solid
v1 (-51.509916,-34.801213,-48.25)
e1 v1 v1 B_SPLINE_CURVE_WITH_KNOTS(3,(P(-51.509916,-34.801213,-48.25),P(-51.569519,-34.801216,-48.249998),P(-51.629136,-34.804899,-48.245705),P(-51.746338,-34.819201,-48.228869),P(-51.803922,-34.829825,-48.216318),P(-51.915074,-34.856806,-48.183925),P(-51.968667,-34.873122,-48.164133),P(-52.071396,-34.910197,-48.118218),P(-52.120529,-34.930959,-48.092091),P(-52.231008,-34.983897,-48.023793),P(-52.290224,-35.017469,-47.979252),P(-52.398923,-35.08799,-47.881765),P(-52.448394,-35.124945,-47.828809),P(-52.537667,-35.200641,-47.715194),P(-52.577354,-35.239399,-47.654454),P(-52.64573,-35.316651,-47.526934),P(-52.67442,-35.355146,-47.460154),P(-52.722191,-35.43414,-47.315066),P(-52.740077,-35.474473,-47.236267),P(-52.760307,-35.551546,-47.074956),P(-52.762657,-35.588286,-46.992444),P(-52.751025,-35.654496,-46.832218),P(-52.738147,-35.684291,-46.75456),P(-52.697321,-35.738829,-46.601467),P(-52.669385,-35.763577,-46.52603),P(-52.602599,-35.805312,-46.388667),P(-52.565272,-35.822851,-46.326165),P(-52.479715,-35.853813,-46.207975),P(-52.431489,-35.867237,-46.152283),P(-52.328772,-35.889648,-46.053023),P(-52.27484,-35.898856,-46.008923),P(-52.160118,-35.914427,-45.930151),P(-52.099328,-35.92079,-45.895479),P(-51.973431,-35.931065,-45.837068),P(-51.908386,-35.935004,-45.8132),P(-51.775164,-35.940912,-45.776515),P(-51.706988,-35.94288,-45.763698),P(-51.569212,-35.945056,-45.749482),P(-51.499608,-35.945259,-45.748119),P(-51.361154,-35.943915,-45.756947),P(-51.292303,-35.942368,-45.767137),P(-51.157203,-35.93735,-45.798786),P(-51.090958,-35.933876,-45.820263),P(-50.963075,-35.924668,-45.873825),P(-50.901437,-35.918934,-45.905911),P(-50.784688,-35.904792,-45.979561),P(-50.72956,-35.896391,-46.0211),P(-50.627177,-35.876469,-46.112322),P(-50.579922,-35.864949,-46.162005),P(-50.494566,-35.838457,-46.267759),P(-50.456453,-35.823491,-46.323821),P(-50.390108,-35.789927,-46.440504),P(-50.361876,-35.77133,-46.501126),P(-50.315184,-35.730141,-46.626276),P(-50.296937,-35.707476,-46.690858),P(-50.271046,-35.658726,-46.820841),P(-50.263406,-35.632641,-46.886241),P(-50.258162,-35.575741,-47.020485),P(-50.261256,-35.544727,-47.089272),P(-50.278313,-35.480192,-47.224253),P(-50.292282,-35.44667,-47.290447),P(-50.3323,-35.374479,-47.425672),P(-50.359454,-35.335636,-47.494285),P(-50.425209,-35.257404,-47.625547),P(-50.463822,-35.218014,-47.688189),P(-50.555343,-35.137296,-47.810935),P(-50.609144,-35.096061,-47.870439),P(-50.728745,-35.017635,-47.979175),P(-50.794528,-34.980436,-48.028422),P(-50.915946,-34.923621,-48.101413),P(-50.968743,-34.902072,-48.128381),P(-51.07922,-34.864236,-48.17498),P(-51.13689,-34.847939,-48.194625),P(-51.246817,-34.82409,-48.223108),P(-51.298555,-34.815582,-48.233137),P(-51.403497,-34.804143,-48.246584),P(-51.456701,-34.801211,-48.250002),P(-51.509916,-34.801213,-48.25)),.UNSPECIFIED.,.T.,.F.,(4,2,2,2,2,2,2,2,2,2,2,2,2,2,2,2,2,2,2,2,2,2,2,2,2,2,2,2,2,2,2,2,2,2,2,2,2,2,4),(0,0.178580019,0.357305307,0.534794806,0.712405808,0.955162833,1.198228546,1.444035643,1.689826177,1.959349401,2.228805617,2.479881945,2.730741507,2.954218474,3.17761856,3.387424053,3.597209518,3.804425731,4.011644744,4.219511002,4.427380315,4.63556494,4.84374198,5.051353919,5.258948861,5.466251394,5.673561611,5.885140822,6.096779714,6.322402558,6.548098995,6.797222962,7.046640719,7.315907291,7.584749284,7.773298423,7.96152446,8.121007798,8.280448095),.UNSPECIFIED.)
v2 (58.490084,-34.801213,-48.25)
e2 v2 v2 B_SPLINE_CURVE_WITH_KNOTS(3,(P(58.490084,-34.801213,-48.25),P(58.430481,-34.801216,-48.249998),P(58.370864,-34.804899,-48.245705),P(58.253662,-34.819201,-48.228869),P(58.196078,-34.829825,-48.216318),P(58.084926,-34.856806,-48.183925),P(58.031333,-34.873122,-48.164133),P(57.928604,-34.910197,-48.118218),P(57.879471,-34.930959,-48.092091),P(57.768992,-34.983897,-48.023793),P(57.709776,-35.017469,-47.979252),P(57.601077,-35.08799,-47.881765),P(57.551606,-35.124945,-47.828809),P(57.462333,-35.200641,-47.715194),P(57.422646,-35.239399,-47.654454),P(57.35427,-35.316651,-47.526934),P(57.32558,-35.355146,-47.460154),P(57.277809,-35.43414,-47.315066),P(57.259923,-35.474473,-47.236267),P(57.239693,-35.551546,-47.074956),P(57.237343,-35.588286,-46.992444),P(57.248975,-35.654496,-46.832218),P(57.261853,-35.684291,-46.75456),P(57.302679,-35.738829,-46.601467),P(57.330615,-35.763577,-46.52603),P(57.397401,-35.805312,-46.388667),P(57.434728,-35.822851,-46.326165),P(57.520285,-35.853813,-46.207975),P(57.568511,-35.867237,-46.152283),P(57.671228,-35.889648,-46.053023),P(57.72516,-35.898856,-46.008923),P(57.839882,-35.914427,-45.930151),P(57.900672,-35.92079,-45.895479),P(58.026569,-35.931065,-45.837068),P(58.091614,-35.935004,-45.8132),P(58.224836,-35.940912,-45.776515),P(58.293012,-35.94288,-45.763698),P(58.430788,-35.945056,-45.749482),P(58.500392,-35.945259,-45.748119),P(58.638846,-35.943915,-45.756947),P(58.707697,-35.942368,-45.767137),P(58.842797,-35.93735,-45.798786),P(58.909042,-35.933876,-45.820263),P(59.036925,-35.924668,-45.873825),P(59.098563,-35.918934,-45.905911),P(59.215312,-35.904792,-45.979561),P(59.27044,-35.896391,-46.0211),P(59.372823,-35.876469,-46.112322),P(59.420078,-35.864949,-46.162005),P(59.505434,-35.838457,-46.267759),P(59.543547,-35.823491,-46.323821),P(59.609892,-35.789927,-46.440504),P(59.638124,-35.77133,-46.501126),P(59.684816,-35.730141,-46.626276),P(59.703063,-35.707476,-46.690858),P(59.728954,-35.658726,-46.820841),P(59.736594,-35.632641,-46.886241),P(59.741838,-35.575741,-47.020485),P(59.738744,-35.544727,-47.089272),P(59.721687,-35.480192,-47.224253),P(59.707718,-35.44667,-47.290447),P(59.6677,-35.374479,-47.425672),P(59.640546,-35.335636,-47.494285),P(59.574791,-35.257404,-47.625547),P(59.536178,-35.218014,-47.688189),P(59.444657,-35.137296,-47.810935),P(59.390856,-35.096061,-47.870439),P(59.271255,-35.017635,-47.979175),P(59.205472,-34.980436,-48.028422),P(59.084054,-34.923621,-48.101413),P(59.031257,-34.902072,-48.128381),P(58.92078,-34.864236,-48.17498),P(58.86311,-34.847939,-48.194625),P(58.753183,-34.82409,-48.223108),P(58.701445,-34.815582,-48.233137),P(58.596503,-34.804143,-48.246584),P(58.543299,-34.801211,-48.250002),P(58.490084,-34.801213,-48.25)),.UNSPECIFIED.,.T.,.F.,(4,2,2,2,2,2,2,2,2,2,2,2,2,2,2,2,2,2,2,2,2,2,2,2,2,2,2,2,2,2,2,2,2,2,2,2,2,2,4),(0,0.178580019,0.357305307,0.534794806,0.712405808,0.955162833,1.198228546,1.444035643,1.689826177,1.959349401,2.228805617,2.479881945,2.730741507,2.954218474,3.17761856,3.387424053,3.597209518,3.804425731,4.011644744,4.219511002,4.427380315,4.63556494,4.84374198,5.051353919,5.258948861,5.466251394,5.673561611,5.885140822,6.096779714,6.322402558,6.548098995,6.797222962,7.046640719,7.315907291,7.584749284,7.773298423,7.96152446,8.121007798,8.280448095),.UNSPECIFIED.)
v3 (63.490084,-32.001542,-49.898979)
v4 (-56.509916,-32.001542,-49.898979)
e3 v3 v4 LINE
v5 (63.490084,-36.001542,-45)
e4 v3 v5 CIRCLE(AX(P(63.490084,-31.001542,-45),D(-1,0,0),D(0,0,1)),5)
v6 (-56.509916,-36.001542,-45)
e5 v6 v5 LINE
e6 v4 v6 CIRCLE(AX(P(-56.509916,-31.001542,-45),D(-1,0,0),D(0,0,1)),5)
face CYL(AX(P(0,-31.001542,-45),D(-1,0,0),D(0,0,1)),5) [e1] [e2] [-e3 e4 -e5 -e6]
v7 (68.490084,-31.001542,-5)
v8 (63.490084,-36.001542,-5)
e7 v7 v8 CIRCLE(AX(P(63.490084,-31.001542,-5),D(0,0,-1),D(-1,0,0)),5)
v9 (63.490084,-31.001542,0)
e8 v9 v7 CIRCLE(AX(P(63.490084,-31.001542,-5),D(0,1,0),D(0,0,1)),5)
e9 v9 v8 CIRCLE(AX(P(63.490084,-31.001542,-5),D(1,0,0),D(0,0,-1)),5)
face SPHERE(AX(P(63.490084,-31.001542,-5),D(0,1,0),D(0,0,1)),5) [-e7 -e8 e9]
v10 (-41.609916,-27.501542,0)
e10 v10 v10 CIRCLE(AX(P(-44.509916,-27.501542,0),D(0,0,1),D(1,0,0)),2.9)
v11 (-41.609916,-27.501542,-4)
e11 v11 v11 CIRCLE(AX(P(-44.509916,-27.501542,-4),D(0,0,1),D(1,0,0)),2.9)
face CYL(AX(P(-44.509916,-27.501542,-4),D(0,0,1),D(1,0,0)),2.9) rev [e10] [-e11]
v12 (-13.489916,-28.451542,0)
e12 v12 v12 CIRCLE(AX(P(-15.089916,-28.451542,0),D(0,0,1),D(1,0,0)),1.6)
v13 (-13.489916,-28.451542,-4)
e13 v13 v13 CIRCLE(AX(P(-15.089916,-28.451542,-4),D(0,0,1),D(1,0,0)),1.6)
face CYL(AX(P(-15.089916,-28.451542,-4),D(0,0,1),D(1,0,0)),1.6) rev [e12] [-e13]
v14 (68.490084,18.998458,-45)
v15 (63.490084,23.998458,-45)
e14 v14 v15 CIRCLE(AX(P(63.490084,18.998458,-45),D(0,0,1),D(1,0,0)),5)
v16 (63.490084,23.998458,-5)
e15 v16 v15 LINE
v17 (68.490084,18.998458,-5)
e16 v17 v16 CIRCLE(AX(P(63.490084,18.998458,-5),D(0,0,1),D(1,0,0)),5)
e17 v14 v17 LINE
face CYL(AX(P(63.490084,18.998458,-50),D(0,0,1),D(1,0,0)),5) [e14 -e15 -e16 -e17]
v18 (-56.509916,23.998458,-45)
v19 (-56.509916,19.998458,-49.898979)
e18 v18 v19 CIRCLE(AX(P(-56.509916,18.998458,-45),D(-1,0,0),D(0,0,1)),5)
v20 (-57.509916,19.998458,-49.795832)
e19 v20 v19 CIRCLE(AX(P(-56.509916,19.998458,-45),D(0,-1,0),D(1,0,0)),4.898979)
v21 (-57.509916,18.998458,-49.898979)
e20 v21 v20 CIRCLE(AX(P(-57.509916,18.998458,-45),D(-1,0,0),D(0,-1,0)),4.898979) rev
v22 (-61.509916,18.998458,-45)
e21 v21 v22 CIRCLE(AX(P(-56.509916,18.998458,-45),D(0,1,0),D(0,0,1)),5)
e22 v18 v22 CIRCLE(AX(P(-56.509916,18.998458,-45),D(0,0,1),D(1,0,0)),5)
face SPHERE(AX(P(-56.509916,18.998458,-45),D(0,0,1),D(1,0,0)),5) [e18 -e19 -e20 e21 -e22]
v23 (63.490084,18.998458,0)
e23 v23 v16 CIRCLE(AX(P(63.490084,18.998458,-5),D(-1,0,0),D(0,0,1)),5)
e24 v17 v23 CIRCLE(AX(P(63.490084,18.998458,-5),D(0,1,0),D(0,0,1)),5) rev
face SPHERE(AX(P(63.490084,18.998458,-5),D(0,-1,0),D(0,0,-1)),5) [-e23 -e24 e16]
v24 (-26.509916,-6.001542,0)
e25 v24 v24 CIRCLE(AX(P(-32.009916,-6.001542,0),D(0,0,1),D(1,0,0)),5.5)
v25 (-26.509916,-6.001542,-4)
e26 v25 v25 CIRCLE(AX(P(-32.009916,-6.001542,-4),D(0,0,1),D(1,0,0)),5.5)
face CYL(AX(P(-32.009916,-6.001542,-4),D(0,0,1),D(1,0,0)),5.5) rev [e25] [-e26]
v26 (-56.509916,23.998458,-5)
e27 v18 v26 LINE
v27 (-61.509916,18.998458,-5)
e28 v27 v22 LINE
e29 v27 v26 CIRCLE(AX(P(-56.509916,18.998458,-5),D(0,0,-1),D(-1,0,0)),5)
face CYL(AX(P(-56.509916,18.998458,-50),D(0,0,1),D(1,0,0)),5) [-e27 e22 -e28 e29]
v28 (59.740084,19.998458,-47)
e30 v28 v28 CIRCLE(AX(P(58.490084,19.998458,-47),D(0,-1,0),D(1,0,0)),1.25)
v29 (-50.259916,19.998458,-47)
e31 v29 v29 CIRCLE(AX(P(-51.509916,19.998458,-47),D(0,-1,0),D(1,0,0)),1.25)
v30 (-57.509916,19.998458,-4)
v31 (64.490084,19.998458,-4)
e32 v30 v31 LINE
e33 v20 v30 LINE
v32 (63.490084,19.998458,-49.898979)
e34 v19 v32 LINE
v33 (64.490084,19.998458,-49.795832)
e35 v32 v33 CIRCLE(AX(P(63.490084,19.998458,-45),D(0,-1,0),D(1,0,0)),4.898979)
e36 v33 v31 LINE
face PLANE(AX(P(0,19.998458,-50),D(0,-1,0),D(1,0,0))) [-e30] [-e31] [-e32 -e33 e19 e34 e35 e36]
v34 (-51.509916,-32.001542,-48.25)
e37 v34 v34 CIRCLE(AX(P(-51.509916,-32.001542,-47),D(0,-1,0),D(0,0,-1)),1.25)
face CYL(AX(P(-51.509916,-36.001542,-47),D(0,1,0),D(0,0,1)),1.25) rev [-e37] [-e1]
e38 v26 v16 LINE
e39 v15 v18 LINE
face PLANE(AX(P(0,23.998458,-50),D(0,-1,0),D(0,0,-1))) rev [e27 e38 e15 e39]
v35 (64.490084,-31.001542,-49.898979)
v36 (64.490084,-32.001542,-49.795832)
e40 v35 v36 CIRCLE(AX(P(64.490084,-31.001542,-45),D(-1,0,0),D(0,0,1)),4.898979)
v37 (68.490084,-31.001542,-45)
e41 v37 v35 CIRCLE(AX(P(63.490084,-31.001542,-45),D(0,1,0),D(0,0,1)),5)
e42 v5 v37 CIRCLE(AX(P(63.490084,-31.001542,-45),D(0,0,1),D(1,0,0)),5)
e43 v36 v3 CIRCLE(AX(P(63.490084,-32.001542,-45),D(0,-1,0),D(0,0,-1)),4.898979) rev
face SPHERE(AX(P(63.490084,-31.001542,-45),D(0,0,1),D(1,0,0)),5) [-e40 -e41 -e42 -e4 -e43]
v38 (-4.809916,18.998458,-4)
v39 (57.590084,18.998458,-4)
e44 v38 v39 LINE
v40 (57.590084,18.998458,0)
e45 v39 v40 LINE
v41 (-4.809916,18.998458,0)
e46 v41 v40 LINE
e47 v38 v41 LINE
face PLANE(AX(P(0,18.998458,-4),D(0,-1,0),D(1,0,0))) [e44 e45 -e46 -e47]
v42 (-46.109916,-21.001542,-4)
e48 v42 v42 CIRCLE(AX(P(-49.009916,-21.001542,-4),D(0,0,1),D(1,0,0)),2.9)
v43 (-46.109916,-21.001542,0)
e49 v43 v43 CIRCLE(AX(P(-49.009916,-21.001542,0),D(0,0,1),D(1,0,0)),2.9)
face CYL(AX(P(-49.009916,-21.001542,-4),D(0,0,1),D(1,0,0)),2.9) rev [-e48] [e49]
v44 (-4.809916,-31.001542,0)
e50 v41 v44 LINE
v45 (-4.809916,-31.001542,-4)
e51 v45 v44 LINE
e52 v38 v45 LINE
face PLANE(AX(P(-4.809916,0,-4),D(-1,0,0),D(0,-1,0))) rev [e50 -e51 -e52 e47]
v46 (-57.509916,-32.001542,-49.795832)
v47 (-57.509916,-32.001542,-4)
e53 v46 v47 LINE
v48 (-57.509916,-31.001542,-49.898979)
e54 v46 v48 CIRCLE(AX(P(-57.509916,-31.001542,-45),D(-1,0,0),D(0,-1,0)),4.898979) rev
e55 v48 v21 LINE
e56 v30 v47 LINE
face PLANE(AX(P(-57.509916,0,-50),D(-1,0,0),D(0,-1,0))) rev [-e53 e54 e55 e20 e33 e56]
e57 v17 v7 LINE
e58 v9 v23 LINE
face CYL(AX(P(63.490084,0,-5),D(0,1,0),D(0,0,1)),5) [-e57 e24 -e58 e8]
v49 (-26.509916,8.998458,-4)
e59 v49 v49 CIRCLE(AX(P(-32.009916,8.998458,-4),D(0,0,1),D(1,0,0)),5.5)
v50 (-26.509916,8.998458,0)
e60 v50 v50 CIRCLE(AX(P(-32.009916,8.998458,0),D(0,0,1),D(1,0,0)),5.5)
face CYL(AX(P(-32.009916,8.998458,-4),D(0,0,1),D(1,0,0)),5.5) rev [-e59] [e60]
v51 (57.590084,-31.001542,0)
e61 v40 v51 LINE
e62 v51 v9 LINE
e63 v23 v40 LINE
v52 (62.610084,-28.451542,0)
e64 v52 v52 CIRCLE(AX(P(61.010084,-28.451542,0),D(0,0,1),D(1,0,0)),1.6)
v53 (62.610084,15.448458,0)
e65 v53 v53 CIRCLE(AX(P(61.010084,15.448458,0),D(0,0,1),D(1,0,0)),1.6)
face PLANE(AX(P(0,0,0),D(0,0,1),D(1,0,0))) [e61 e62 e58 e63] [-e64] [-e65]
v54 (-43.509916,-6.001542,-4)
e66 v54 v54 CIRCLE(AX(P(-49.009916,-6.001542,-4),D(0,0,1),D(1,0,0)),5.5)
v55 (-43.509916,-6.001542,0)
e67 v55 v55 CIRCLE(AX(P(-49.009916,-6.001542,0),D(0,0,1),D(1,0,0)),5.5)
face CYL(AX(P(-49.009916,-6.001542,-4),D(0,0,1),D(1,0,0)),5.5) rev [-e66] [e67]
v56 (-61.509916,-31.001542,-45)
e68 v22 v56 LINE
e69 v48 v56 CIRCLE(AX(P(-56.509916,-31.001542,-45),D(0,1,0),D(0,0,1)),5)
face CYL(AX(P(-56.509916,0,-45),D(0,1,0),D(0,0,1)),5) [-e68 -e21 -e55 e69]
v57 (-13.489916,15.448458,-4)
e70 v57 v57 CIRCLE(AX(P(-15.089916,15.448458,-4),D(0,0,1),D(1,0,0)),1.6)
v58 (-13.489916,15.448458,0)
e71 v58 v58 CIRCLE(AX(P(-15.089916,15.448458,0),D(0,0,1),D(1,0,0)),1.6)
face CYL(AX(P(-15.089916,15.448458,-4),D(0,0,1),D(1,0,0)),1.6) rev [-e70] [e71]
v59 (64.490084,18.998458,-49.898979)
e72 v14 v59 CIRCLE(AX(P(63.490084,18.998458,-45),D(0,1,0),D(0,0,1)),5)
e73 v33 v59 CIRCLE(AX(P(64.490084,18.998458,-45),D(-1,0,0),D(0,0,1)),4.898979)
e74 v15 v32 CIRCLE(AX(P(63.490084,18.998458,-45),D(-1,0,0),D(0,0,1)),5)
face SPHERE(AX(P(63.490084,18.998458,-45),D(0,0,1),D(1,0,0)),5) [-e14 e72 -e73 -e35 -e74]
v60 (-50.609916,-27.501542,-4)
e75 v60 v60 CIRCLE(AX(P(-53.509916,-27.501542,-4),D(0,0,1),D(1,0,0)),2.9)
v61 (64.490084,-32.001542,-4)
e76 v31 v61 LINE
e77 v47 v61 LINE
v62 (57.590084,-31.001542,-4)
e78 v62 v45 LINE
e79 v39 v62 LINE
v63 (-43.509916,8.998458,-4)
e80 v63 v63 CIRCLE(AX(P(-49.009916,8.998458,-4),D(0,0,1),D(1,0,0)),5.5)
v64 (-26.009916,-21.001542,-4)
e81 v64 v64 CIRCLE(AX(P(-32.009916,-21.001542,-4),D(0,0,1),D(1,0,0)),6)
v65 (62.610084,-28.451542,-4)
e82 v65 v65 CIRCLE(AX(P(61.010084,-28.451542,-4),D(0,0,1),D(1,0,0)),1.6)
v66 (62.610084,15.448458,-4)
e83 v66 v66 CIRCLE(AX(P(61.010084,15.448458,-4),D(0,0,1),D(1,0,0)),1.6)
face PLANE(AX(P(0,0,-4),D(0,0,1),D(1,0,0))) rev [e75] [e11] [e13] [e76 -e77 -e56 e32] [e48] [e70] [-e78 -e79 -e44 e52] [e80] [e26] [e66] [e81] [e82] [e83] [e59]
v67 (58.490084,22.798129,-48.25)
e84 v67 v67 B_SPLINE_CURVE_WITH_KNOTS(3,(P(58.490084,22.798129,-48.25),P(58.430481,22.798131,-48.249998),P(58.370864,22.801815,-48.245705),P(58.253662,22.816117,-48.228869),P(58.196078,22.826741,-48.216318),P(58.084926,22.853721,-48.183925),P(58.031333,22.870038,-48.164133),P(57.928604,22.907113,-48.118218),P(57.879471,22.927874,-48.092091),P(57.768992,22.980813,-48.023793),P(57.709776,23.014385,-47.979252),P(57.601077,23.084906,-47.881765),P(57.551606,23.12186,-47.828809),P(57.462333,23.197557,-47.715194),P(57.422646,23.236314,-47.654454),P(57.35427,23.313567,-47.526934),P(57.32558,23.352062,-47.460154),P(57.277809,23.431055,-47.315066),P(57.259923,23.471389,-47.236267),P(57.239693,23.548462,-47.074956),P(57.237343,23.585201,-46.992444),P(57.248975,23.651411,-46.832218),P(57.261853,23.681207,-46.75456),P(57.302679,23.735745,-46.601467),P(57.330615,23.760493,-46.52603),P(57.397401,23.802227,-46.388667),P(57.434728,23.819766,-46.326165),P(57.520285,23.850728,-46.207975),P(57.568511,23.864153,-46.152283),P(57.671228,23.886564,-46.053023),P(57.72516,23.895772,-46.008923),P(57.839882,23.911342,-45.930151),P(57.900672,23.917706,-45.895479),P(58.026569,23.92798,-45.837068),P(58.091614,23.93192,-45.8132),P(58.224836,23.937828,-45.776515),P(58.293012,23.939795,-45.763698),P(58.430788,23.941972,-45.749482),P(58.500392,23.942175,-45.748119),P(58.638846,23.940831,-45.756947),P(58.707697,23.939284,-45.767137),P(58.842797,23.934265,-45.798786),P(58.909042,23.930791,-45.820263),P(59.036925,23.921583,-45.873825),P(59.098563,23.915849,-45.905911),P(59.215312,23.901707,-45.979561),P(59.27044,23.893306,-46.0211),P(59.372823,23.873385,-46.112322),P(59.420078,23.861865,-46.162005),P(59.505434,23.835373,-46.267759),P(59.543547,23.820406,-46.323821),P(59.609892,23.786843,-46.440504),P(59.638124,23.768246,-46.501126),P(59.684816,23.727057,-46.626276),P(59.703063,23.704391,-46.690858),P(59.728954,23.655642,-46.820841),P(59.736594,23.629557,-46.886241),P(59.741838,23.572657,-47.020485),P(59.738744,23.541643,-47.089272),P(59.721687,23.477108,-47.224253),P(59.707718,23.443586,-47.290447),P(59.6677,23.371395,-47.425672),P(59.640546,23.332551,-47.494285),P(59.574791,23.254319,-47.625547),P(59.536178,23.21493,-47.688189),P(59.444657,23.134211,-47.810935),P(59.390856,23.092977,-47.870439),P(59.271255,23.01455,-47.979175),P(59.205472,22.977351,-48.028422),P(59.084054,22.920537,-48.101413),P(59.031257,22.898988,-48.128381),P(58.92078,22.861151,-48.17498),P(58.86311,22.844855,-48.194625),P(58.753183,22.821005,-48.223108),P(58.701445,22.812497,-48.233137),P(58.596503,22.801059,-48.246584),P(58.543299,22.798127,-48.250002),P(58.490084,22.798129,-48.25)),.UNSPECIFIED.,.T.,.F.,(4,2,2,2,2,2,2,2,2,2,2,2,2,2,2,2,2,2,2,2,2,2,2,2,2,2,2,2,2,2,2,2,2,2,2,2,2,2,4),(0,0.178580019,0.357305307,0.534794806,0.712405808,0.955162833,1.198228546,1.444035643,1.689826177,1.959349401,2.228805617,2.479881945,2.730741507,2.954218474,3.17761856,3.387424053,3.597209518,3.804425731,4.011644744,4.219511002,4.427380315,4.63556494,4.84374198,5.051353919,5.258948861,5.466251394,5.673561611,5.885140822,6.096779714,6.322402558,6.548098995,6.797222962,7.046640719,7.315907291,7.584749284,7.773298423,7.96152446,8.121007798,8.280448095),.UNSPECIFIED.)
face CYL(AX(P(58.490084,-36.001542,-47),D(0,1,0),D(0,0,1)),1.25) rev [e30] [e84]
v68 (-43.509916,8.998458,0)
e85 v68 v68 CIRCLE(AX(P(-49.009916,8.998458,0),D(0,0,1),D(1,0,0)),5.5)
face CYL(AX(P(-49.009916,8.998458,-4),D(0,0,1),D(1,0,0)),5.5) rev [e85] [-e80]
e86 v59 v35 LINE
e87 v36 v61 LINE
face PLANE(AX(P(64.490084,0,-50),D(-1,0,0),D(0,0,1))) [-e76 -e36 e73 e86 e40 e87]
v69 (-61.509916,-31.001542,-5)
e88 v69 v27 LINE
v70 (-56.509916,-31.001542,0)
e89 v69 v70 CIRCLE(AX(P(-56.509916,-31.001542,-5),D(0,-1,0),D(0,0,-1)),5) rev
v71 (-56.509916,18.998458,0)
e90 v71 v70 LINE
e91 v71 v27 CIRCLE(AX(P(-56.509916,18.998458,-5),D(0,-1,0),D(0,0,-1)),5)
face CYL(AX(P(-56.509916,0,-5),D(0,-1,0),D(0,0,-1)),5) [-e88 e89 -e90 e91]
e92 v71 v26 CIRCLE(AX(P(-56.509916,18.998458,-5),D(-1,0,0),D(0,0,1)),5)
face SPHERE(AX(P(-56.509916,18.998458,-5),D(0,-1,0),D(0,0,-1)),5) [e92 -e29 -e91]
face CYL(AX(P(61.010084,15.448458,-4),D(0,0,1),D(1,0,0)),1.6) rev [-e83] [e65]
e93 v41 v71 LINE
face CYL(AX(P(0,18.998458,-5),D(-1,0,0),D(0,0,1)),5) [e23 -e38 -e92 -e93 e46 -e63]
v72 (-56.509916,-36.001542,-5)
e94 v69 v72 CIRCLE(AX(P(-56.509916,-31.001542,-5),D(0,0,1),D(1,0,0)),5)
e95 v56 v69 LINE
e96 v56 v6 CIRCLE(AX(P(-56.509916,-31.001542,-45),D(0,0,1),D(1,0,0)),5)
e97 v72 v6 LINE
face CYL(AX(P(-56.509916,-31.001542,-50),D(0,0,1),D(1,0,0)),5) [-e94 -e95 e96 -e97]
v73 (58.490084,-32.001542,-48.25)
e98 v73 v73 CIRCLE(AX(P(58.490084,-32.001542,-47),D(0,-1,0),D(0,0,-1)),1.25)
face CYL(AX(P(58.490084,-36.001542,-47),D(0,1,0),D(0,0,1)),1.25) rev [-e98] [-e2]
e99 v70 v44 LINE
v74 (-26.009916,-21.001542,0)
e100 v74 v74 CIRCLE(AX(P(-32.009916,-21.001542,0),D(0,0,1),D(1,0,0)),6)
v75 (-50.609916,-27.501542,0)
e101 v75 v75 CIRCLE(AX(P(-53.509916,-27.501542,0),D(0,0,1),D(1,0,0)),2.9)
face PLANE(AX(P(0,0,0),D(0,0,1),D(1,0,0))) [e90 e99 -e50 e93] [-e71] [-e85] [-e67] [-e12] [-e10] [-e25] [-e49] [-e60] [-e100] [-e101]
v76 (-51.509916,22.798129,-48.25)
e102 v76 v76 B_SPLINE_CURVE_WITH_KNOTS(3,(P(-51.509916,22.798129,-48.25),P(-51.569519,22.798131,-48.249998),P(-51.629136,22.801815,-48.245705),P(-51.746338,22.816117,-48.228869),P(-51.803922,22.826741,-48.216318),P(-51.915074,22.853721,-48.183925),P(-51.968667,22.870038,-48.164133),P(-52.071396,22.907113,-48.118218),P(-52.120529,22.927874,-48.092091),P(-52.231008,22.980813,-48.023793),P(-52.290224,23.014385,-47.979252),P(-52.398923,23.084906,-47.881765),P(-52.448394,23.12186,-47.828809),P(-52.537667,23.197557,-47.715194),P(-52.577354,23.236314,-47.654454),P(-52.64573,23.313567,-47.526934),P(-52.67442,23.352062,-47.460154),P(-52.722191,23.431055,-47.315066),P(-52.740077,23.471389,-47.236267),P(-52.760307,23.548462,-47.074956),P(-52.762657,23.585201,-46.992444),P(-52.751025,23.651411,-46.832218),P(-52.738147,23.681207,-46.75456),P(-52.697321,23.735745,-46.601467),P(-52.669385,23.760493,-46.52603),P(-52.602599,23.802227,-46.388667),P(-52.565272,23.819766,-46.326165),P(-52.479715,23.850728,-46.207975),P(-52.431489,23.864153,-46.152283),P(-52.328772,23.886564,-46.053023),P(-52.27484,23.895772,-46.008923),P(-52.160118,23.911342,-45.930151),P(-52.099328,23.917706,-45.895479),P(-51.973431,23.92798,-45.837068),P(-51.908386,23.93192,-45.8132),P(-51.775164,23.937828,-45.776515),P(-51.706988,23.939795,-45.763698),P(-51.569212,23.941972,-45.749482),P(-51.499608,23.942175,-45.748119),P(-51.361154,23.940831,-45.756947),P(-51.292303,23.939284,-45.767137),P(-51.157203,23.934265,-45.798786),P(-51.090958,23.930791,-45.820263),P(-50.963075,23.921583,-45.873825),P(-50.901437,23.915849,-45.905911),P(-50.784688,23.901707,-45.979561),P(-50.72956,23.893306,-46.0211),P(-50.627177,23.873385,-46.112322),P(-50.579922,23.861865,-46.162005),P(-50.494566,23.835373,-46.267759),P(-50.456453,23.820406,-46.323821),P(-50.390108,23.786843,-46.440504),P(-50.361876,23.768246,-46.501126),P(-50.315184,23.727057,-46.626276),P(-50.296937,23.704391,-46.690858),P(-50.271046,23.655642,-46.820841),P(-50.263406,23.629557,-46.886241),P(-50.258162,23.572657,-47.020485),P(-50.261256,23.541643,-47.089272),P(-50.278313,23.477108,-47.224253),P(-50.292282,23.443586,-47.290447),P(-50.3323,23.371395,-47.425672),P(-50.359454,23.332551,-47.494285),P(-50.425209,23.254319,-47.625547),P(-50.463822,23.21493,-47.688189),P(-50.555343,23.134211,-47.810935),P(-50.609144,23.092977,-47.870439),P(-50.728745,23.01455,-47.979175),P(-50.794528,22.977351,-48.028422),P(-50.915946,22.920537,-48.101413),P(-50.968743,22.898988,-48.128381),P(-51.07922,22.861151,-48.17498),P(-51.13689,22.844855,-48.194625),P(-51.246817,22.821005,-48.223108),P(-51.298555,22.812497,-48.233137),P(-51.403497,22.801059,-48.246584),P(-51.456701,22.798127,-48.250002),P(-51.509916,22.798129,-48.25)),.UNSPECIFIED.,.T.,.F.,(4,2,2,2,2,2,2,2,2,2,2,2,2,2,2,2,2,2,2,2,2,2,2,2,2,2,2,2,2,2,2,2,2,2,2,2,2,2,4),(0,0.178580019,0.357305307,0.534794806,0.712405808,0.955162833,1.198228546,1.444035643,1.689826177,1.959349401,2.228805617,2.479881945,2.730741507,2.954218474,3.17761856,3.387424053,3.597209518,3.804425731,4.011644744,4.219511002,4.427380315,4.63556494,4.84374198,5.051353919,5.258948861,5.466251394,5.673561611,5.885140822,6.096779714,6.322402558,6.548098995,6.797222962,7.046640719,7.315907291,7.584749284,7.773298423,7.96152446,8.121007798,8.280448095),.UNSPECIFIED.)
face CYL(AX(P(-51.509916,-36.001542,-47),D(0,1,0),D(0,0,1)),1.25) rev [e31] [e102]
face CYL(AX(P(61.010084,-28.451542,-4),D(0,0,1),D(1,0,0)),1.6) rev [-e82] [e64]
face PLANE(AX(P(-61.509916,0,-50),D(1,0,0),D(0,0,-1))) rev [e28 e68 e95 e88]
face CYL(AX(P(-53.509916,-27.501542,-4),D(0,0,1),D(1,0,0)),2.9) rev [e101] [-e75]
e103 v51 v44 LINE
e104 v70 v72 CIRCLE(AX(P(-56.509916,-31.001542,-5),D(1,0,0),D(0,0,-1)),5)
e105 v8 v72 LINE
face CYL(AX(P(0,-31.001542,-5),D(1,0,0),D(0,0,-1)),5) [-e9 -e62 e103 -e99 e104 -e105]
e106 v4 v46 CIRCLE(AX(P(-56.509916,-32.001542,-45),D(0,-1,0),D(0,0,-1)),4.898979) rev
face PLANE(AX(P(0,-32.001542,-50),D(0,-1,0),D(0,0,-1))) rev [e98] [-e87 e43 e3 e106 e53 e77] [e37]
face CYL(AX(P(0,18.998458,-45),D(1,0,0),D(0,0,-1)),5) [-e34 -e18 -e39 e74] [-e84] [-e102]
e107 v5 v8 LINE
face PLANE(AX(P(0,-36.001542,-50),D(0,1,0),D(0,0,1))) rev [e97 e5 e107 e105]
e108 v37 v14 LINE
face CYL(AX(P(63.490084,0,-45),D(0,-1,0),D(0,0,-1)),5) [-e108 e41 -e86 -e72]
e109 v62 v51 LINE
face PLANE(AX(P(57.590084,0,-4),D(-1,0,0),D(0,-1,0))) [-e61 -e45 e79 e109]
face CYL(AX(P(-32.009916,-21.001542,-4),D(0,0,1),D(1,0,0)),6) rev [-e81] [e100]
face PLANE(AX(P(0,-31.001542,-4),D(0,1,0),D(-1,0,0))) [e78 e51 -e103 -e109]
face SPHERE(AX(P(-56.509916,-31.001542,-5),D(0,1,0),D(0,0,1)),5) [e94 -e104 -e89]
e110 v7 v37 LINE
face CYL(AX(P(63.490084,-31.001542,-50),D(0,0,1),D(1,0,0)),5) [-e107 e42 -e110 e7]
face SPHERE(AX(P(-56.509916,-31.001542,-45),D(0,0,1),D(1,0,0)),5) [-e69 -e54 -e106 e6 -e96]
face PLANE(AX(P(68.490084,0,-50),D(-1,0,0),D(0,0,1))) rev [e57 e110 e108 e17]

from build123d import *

# Parameters (mm, degrees)
SKETCH1_W           = 122
SKETCH1_H           = 52
SKETCH1_R           = 2.9
SKETCH1_R_2         = 6
SKETCH1_R_3         = 5.5
SKETCH1_W_2         = 62.4
SKETCH1_H_2         = 50
SKETCH1_R_4         = 1.6
BOSS_EXTRUDE1_DEPTH = 4
SKETCH1_3_W         = 4
SKETCH1_3_H         = 52
BOSS_EXTRUDE2_DEPTH = 50
SKETCH3_R           = 1.25
CUT_EXTRUDE1_DEPTH  = 104.879216611
FILLET2_R           = 5
FILLET3_R           = 5
FILLET4_R           = 5
FILLET5_R           = 5
FILLET6_R           = 5


# Some blends are built 0.0001 mm under size
with BuildPart() as part:
    # Sketch1 → Boss-Extrude1 (new body)
    with BuildSketch(Plane.XY):
        with Locations((3.490084273, -6.001542194)):
            Rectangle(SKETCH1_W, SKETCH1_H)
        with Locations((-53.509915727, -27.501542194)):
            Circle(SKETCH1_R, mode=Mode.SUBTRACT)
        with Locations((-44.509915727, -27.501542194)):
            Circle(SKETCH1_R, mode=Mode.SUBTRACT)
        with Locations((-49.009915727, -21.001542194)):
            Circle(SKETCH1_R, mode=Mode.SUBTRACT)
        with Locations((-32.009915727, -21.001542194)):
            Circle(SKETCH1_R_2, mode=Mode.SUBTRACT)
        with Locations((-49.009915727, -6.001542194)):
            Circle(SKETCH1_R_3, mode=Mode.SUBTRACT)
        with Locations((-32.009915727, -6.001542194)):
            Circle(SKETCH1_R_3, mode=Mode.SUBTRACT)
        with Locations((-49.009915727, 8.998457806)):
            Circle(SKETCH1_R_3, mode=Mode.SUBTRACT)
        with Locations((-32.009915727, 8.998457806)):
            Circle(SKETCH1_R_3, mode=Mode.SUBTRACT)
        with Locations((26.390084273, -6.001542194)):
            Rectangle(SKETCH1_W_2, SKETCH1_H_2, mode=Mode.SUBTRACT)
        with Locations((-15.089915727, 15.448457806)):
            Circle(SKETCH1_R_4, mode=Mode.SUBTRACT)
        with Locations((-15.089915727, -28.451542194)):
            Circle(SKETCH1_R_4, mode=Mode.SUBTRACT)
        with Locations((61.010084273, 15.448457806)):
            Circle(SKETCH1_R_4, mode=Mode.SUBTRACT)
        with Locations((61.010084273, -28.451542194)):
            Circle(SKETCH1_R_4, mode=Mode.SUBTRACT)
    extrude(amount=-BOSS_EXTRUDE1_DEPTH)

    # Sketch1<3> → Boss-Extrude2 (add)
    with BuildSketch(Plane.XY):
        Polygon((68.490084273, 23.998457806), (-61.509915727, 23.998457806), (-61.509915727, 19.998457806), (-57.509915727, 19.998457806), (64.490084273, 19.998457806), (68.490084273, 19.998457806), align=None)
        with Locations((-59.509915727, -6.001542194)):
            Rectangle(SKETCH1_3_W, SKETCH1_3_H)
        with Locations((66.490084273, -6.001542194)):
            Rectangle(SKETCH1_3_W, SKETCH1_3_H)
        Polygon((-57.509915727, -32.001542194), (-61.509915727, -32.001542194), (-61.509915727, -36.001542194), (68.490084273, -36.001542194), (68.490084273, -32.001542194), (64.490084273, -32.001542194), align=None)
    extrude(amount=-BOSS_EXTRUDE2_DEPTH)

    # Sketch3 → Cut-Extrude1 (cut, through all)
    with BuildSketch(Plane(origin=(0, 23.998457806, 0), x_dir=(1, 0, 0), z_dir=(0, 1, 0))):
        with Locations(Location((-51.509915727, 47, 0), (0, 0, 270))):
            Circle(SKETCH3_R)
        with Locations(Location((58.490084273, 47, 0), (0, 0, 270))):
            Circle(SKETCH3_R)
    extrude(amount=-CUT_EXTRUDE1_DEPTH, mode=Mode.SUBTRACT)

    # Fillet2
    fillet2_edges = [part.edges().sort_by_distance(p)[0] for p in [
        (-61.509915727, -6.001542194, 0),
    ]]
    fillet(fillet2_edges, radius=FILLET2_R)

    # Fillet3
    fillet3_edges = [part.edges().sort_by_distance(p)[0] for p in [
        (68.490084273, -6.001542194, 0),
    ]]
    fillet(fillet3_edges, radius=FILLET3_R)

    # Fillet4
    fillet4_edges = [part.edges().sort_by_distance(p)[0] for p in [
        (3.490084273, 23.998457806, 0),
        (-60.045449633, 23.998457806, -1.464466094),
        (67.025618179, 23.998457806, -1.464466094),
        (-61.509915727, 23.998457806, -27.5),
        (68.490084273, 23.998457806, -27.5),
    ]]
    fillet(fillet4_edges, radius=FILLET4_R - 0.0001)  # a hair under: the kernel refuses the full size

    # Fillet5
    fillet5_edges = [part.edges().sort_by_distance(p)[0] for p in [
        (-60.045449633, -36.001542194, -1.464466094),
        (3.490084273, -36.001542194, 0),
        (67.025618179, -36.001542194, -1.464466094),
        (68.490084273, -36.001542194, -27.5),
        (-61.509915727, -36.001542194, -27.5),
    ]]
    fillet(fillet5_edges, radius=FILLET5_R - 0.0001)  # a hair under: the kernel refuses the full size

    # Fillet6
    # the kernel refuses this fillet: 5 mm, written as the material it takes off along each edge
    with BuildSketch(Plane(origin=(-56.510015727, 18.998557806, -50), x_dir=(-1, 0, 0), z_dir=(0, -1, 0))) as fillet6_piece_1:
        with BuildLine():
            CenterArc((0, -4.9999), FILLET6_R, 0, 90)
            Line((5, -4.9999), (5.1, -4.9999))
            ThreePointArc((5.1, -4.9999), (5.0999, -2.49995), (5.0999, 0))
            Line((5.0999, 0), (4.9999, 0.1))
            ThreePointArc((4.9999, 0.1), (2.49995, 0.1), (0, 0.1001))
            Line((0, 0.1001), (0, 0.0001))
        make_face()
    revolve(axis=Axis((-56.510015727, 18.998557806, -50), (0, 0, -1)), revolution_arc=90, mode=Mode.SUBTRACT)
    with BuildSketch(Plane(origin=(-61.509915727, 18.998557806, -50), x_dir=(-2.0000400003242763e-05, 0, 0.9999999997999919), z_dir=(0, -1, 0)), Plane(origin=(68.490084273, -31.001642194, -50), x_dir=(2.0000400004663874e-05, 0, 0.9999999997999919), z_dir=(0, 1, 0))) as fillet6_piece_2:
        with BuildLine():
            CenterArc((4.999799999, -4.999999999), FILLET6_R, 89.998854061, 90)
            Line((-0.0002, -4.999899997), (-0.1002, -4.999897997))
            ThreePointArc((-0.1002, -4.999897997), (-0.10005, -2.499947999), (-0.1, 2e-06))
            Line((-0.1, 2e-06), (2e-06, 0.1))
            ThreePointArc((2e-06, 0.1), (2.499952, 0.09995), (4.999902001, 0.1))
            Line((4.999902001, 0.1), (4.999900001, 0))
        make_face()
    extrude(amount=50.0002, mode=Mode.SUBTRACT)
    with BuildSketch(Plane(origin=(-56.510015727, -31.001642194, -50), x_dir=(0, -1, 0), z_dir=(1, 0, 0))) as fillet6_piece_3:
        with BuildLine():
            CenterArc((0, -4.9999), FILLET6_R, 0, 90)
            Line((5, -4.9999), (5.1, -4.9999))
            ThreePointArc((5.1, -4.9999), (5.0999, -2.49995), (5.0999, 0))
            Line((5.0999, 0), (4.9999, 0.1))
            ThreePointArc((4.9999, 0.1), (2.49995, 0.1), (0, 0.1001))
            Line((0, 0.1001), (0, 0.0001))
        make_face()
    revolve(axis=Axis((-56.510015727, -31.001642194, -50), (0, 0, -1)), revolution_arc=90, mode=Mode.SUBTRACT)
    with BuildSketch(Plane(origin=(-56.510015727, -36.001542194, -50), x_dir=(0, -2.0000400004663874e-05, 0.9999999997999919), z_dir=(1, 0, 0)), Plane(origin=(63.490184273, 23.998457806, -50), x_dir=(0, 2.000040000395332e-05, 0.9999999997999919), z_dir=(-1, 0, 0))) as fillet6_piece_4:
        with BuildLine():
            CenterArc((4.999799999, -4.999999999), FILLET6_R, 89.998854061, 90)
            Line((-0.0002, -4.999899997), (-0.1002, -4.999897997))
            ThreePointArc((-0.1002, -4.999897997), (-0.10005, -2.499947999), (-0.1, 2e-06))
            Line((-0.1, 2e-06), (2e-06, 0.1))
            ThreePointArc((2e-06, 0.1), (2.499952, 0.09995), (4.999902001, 0.1))
            Line((4.999902001, 0.1), (4.999900001, 0))
        make_face()
    extrude(amount=120.0002, mode=Mode.SUBTRACT)
    with BuildSketch(Plane(origin=(63.490184273, -31.001642194, -50), x_dir=(0, -1, 0), z_dir=(-1, 0, 0))) as fillet6_piece_5:
        with BuildLine():
            CenterArc((0, 4.9999), FILLET6_R, 270, 90)
            Line((0, -0.0001), (0, -0.1001))
            ThreePointArc((0, -0.1001), (2.49995, -0.1), (4.9999, -0.1))
            Line((4.9999, -0.1), (5.0999, 0))
            ThreePointArc((5.0999, 0), (5.0999, 2.49995), (5.1, 4.9999))
            Line((5.1, 4.9999), (5, 4.9999))
        make_face()
    revolve(axis=Axis((63.490184273, -31.001642194, -50), (0, 0, 1)), revolution_arc=90, mode=Mode.SUBTRACT)
    with BuildSketch(Plane(origin=(63.490184273, 18.998557806, -50), x_dir=(1, 0, 0), z_dir=(0, -1, 0))) as fillet6_piece_6:
        with BuildLine():
            CenterArc((0, 4.9999), FILLET6_R, 270, 90)
            Line((0, -0.0001), (0, -0.1001))
            ThreePointArc((0, -0.1001), (2.49995, -0.1), (4.9999, -0.1))
            Line((4.9999, -0.1), (5.0999, 0))
            ThreePointArc((5.0999, 0), (5.0999, 2.49995), (5.1, 4.9999))
            Line((5.1, 4.9999), (5, 4.9999))
        make_face()
    revolve(axis=Axis((63.490184273, 18.998557806, -50), (0, 0, 1)), revolution_arc=90, mode=Mode.SUBTRACT)


solid = part.part
